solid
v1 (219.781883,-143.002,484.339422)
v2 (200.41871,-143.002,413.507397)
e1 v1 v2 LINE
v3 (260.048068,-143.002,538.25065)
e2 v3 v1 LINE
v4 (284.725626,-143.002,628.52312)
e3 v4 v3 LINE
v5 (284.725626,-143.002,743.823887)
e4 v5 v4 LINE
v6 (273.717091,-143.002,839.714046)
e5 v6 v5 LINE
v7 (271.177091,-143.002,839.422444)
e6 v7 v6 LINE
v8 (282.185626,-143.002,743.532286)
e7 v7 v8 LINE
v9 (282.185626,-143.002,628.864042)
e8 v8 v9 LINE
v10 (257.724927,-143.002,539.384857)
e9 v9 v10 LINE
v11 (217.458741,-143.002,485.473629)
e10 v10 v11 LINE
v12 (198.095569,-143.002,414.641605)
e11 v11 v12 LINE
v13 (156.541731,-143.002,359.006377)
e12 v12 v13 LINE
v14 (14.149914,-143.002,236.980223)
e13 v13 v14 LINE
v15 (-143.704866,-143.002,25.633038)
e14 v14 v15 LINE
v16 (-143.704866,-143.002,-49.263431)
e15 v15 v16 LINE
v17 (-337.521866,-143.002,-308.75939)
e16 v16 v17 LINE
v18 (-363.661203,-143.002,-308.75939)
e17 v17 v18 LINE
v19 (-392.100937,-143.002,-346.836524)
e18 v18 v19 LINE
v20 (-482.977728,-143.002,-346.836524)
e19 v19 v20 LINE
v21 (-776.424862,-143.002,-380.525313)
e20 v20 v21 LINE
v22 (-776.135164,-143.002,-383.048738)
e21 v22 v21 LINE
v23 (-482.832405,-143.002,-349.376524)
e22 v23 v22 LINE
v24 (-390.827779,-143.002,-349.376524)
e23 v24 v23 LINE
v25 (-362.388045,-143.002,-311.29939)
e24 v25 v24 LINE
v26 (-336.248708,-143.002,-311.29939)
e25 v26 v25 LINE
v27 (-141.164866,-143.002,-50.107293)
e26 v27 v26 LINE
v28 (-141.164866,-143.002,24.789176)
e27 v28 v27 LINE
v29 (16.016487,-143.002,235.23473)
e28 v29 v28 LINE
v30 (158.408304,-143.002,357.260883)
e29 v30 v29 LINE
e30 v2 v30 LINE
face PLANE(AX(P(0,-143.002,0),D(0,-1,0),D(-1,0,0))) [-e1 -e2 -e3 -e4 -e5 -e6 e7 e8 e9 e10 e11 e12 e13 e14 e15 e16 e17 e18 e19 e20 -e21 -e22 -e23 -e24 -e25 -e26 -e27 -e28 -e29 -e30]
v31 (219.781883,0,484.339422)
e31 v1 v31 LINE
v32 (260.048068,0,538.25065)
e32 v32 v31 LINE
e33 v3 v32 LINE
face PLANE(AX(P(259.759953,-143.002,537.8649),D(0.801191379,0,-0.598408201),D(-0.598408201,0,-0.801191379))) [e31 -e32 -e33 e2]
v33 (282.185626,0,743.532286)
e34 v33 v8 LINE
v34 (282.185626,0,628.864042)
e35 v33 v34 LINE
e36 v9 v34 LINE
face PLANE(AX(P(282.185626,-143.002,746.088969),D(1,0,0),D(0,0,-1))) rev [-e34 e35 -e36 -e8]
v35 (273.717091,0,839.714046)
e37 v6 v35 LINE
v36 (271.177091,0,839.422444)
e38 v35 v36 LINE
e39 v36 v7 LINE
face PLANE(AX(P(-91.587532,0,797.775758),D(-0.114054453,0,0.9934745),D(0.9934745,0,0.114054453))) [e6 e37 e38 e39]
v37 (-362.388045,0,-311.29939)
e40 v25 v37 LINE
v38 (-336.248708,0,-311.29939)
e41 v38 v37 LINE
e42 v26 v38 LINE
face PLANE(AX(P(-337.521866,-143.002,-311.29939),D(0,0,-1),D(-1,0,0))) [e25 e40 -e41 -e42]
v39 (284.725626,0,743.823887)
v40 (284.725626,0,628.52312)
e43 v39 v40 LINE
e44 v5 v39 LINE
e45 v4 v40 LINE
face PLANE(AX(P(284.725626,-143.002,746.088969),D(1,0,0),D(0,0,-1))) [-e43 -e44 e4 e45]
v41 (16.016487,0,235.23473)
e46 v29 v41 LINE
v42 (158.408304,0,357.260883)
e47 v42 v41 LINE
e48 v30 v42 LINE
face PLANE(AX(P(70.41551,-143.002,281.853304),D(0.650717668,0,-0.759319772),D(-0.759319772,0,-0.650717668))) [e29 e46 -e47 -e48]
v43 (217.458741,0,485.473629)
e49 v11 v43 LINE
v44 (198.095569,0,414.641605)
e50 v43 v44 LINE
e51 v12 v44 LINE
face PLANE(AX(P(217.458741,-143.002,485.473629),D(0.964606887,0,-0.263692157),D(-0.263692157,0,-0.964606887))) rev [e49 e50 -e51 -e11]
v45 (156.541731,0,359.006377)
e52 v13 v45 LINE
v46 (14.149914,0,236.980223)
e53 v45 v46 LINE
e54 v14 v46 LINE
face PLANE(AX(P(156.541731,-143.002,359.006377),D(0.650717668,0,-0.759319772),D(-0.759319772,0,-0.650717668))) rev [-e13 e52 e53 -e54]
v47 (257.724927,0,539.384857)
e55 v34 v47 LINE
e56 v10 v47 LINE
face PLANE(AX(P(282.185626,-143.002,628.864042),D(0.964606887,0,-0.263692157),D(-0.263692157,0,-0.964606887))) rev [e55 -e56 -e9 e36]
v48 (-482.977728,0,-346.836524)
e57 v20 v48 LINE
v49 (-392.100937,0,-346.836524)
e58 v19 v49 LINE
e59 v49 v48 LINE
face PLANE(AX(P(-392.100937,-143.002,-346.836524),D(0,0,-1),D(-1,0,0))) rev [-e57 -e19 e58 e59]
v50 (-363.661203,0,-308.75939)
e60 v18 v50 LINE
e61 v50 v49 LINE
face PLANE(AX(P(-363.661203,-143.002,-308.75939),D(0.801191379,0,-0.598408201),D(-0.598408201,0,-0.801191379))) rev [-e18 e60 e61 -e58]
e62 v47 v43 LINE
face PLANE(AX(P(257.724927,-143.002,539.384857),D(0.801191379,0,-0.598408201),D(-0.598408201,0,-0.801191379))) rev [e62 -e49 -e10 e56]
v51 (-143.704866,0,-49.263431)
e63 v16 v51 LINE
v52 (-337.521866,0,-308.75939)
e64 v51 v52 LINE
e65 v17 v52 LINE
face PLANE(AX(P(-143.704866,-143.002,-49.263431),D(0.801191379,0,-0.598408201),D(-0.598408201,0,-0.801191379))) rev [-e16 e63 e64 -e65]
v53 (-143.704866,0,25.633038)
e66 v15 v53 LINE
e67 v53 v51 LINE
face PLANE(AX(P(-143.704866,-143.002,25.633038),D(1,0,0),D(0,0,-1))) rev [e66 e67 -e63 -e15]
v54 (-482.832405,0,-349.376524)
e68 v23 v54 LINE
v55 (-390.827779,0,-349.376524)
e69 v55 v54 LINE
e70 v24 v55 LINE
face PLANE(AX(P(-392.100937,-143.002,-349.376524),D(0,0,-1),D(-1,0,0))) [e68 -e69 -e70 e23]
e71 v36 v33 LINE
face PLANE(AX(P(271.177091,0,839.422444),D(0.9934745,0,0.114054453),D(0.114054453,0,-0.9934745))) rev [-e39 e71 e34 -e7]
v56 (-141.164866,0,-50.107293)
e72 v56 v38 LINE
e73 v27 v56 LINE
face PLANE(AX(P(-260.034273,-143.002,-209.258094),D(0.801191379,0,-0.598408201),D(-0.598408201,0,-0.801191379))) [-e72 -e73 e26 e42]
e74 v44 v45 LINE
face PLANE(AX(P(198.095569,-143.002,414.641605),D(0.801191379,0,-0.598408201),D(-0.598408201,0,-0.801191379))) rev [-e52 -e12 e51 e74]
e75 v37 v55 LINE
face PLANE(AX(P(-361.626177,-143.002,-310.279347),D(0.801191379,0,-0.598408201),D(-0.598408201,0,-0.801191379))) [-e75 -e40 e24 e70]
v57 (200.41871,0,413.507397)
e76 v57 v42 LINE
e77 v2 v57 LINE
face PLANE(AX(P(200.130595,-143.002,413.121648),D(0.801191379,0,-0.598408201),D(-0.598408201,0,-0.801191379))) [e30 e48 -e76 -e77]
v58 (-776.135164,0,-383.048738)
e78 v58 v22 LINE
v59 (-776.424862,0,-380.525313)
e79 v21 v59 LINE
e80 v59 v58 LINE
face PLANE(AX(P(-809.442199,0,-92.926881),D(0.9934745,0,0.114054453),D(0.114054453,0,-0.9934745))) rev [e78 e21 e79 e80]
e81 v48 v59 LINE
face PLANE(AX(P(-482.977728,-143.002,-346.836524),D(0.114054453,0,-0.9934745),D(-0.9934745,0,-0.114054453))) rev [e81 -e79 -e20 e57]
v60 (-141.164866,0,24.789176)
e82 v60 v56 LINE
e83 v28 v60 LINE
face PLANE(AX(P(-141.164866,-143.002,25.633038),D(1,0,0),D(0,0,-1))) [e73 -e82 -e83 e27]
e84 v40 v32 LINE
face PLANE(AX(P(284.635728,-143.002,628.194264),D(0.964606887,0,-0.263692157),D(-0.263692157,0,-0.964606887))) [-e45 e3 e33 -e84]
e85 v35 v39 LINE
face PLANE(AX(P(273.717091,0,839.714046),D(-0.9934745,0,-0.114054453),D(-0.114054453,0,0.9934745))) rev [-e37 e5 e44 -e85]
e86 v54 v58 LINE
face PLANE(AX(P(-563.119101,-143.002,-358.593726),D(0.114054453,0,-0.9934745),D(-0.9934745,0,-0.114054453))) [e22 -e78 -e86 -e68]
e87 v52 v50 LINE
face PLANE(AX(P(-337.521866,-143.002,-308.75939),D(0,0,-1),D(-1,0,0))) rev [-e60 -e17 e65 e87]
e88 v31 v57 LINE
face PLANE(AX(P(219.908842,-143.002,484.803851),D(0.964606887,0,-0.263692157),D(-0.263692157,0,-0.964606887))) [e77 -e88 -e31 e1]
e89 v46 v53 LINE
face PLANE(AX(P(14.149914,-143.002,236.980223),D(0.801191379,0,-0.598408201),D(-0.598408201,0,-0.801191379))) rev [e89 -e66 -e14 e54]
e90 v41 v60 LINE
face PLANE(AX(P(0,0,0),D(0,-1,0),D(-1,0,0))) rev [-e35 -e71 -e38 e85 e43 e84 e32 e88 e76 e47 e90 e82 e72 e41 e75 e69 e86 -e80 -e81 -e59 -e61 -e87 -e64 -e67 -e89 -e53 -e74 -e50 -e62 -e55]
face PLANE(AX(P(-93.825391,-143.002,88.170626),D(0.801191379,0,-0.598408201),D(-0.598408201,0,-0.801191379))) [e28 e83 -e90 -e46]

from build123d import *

# Parameters (mm, degrees)
EXTRUDE_THIN1_DEPTH = 143.002
SKETCH2_W           = 353.476809532
SKETCH2_H           = 287.248033411
CUT_EXTRUDE1_DEPTH  = 2.54
SKETCH5_W           = 2.556683639
SKETCH5_H           = 143.002
BOSS_EXTRUDE1_DEPTH = 96.52
SKETCH6_W           = 436.207107494
SKETCH6_H           = 411.415497476
CUT_EXTRUDE3_DEPTH  = 2.54
SKETCH9_W           = 2.54
SKETCH9_H           = 143.002
BOSS_EXTRUDE2_DEPTH = 154.94


with BuildPart() as part:
    # Sketch1 → Extrude-Thin1 (new body)
    with BuildSketch(Plane(origin=(0, 0, 0), x_dir=(1, 0, 0), z_dir=(0, 1, 0))):
        Polygon((429.494620494, -763.000572689), (282.185626339, -746.088969303), (282.185626339, -628.864042129), (257.724926693, -539.38485687), (217.458740987, -485.473629066), (198.09556878, -414.64160471), (156.541730962, -359.006376852), (68.762687355, -283.781976389), (14.14991429, -236.980223457), (-45.64531009, -156.922132367), (-95.860416986, -89.690582628), (-143.704865867, -25.633038127), (-143.704865867, 49.263431443), (-195.539820534, 118.663748365), (-262.069299432, 207.73813745), (-337.521866174, 308.759389966), (-363.661203016, 308.759389966), (-392.100936643, 346.836524201), (-482.977728206, 346.836524201), (-563.408799351, 356.070301017), (-625.019348636, 363.143414101), (-604.768848946, 539.535957871), (-602.245423716, 539.246259561), (-622.206225096, 365.37714102), (-563.119101041, 358.593726247), (-482.832404898, 349.376524201), (-390.827778697, 349.376524201), (-362.38804507, 311.299389966), (-336.248708228, 311.299389966), (-260.03427333, 209.258094281), (-193.504794432, 120.183705196), (-141.164865867, 50.107293372), (-141.164865867, -24.789176199), (-93.825390885, -88.170625798), (-43.610283989, -155.402175536), (16.016487249, -235.234729602), (70.415510233, -281.853304168), (158.408303922, -357.260882997), (200.418710431, -413.50739743), (219.781882638, -484.339421786), (260.048068344, -538.25064959), (284.725626339, -628.523119941), (284.725626339, -743.823886817), (429.784318804, -760.477147459), align=None)
    extrude(amount=-EXTRUDE_THIN1_DEPTH)

    # Sketch2 → Cut-Extrude1 (cut)
    with BuildSketch(Plane(origin=(-80.868694539, 0, 704.409024928), x_dir=(0.9934744998263692, 0, 0.11405445276158947), z_dir=(-0.11405445276158947, 0, 0.9934744998263692))):
        with Locations((435.779818352, -64.905243111)):
            Rectangle(SKETCH2_W, SKETCH2_H)
    extrude(amount=-CUT_EXTRUDE1_DEPTH, mode=Mode.SUBTRACT)

    # Sketch5 → Boss-Extrude1 (add)
    with BuildSketch(Plane(origin=(-80.578996229, 0, 701.885599699), x_dir=(0.9934744998263692, 0, 0.11405445276158968), z_dir=(-0.1140544527615897, 0, 0.9934744998263693))):
        with Locations((366.425733757, -71.501)):
            Rectangle(SKETCH5_W, SKETCH5_H)
    extrude(amount=BOSS_EXTRUDE1_DEPTH)

    # Sketch6 → Cut-Extrude3 (cut)
    with BuildSketch(Plane(origin=(-658.036684967, 0, -75.544982799), x_dir=(-0.11405445276159007, 0, 0.9934744998263692), z_dir=(-0.993474499826369, 0, -0.11405445276159006))):
        with Locations((-358.307764933, -83.68082163)):
            Rectangle(SKETCH6_W, SKETCH6_H)
    extrude(amount=-CUT_EXTRUDE3_DEPTH, mode=Mode.SUBTRACT)

    # Sketch9 → Boss-Extrude2 (add)
    with BuildSketch(Plane(origin=(-655.513259738, 0, -75.255284489), x_dir=(-0.11405445276159011, 0, 0.9934744998263692), z_dir=(-0.993474499826369, 0, -0.1140544527615901))):
        with Locations((-290.757481915, -71.501)):
            Rectangle(SKETCH9_W, SKETCH9_H)
    extrude(amount=BOSS_EXTRUDE2_DEPTH)


solid = part.part
